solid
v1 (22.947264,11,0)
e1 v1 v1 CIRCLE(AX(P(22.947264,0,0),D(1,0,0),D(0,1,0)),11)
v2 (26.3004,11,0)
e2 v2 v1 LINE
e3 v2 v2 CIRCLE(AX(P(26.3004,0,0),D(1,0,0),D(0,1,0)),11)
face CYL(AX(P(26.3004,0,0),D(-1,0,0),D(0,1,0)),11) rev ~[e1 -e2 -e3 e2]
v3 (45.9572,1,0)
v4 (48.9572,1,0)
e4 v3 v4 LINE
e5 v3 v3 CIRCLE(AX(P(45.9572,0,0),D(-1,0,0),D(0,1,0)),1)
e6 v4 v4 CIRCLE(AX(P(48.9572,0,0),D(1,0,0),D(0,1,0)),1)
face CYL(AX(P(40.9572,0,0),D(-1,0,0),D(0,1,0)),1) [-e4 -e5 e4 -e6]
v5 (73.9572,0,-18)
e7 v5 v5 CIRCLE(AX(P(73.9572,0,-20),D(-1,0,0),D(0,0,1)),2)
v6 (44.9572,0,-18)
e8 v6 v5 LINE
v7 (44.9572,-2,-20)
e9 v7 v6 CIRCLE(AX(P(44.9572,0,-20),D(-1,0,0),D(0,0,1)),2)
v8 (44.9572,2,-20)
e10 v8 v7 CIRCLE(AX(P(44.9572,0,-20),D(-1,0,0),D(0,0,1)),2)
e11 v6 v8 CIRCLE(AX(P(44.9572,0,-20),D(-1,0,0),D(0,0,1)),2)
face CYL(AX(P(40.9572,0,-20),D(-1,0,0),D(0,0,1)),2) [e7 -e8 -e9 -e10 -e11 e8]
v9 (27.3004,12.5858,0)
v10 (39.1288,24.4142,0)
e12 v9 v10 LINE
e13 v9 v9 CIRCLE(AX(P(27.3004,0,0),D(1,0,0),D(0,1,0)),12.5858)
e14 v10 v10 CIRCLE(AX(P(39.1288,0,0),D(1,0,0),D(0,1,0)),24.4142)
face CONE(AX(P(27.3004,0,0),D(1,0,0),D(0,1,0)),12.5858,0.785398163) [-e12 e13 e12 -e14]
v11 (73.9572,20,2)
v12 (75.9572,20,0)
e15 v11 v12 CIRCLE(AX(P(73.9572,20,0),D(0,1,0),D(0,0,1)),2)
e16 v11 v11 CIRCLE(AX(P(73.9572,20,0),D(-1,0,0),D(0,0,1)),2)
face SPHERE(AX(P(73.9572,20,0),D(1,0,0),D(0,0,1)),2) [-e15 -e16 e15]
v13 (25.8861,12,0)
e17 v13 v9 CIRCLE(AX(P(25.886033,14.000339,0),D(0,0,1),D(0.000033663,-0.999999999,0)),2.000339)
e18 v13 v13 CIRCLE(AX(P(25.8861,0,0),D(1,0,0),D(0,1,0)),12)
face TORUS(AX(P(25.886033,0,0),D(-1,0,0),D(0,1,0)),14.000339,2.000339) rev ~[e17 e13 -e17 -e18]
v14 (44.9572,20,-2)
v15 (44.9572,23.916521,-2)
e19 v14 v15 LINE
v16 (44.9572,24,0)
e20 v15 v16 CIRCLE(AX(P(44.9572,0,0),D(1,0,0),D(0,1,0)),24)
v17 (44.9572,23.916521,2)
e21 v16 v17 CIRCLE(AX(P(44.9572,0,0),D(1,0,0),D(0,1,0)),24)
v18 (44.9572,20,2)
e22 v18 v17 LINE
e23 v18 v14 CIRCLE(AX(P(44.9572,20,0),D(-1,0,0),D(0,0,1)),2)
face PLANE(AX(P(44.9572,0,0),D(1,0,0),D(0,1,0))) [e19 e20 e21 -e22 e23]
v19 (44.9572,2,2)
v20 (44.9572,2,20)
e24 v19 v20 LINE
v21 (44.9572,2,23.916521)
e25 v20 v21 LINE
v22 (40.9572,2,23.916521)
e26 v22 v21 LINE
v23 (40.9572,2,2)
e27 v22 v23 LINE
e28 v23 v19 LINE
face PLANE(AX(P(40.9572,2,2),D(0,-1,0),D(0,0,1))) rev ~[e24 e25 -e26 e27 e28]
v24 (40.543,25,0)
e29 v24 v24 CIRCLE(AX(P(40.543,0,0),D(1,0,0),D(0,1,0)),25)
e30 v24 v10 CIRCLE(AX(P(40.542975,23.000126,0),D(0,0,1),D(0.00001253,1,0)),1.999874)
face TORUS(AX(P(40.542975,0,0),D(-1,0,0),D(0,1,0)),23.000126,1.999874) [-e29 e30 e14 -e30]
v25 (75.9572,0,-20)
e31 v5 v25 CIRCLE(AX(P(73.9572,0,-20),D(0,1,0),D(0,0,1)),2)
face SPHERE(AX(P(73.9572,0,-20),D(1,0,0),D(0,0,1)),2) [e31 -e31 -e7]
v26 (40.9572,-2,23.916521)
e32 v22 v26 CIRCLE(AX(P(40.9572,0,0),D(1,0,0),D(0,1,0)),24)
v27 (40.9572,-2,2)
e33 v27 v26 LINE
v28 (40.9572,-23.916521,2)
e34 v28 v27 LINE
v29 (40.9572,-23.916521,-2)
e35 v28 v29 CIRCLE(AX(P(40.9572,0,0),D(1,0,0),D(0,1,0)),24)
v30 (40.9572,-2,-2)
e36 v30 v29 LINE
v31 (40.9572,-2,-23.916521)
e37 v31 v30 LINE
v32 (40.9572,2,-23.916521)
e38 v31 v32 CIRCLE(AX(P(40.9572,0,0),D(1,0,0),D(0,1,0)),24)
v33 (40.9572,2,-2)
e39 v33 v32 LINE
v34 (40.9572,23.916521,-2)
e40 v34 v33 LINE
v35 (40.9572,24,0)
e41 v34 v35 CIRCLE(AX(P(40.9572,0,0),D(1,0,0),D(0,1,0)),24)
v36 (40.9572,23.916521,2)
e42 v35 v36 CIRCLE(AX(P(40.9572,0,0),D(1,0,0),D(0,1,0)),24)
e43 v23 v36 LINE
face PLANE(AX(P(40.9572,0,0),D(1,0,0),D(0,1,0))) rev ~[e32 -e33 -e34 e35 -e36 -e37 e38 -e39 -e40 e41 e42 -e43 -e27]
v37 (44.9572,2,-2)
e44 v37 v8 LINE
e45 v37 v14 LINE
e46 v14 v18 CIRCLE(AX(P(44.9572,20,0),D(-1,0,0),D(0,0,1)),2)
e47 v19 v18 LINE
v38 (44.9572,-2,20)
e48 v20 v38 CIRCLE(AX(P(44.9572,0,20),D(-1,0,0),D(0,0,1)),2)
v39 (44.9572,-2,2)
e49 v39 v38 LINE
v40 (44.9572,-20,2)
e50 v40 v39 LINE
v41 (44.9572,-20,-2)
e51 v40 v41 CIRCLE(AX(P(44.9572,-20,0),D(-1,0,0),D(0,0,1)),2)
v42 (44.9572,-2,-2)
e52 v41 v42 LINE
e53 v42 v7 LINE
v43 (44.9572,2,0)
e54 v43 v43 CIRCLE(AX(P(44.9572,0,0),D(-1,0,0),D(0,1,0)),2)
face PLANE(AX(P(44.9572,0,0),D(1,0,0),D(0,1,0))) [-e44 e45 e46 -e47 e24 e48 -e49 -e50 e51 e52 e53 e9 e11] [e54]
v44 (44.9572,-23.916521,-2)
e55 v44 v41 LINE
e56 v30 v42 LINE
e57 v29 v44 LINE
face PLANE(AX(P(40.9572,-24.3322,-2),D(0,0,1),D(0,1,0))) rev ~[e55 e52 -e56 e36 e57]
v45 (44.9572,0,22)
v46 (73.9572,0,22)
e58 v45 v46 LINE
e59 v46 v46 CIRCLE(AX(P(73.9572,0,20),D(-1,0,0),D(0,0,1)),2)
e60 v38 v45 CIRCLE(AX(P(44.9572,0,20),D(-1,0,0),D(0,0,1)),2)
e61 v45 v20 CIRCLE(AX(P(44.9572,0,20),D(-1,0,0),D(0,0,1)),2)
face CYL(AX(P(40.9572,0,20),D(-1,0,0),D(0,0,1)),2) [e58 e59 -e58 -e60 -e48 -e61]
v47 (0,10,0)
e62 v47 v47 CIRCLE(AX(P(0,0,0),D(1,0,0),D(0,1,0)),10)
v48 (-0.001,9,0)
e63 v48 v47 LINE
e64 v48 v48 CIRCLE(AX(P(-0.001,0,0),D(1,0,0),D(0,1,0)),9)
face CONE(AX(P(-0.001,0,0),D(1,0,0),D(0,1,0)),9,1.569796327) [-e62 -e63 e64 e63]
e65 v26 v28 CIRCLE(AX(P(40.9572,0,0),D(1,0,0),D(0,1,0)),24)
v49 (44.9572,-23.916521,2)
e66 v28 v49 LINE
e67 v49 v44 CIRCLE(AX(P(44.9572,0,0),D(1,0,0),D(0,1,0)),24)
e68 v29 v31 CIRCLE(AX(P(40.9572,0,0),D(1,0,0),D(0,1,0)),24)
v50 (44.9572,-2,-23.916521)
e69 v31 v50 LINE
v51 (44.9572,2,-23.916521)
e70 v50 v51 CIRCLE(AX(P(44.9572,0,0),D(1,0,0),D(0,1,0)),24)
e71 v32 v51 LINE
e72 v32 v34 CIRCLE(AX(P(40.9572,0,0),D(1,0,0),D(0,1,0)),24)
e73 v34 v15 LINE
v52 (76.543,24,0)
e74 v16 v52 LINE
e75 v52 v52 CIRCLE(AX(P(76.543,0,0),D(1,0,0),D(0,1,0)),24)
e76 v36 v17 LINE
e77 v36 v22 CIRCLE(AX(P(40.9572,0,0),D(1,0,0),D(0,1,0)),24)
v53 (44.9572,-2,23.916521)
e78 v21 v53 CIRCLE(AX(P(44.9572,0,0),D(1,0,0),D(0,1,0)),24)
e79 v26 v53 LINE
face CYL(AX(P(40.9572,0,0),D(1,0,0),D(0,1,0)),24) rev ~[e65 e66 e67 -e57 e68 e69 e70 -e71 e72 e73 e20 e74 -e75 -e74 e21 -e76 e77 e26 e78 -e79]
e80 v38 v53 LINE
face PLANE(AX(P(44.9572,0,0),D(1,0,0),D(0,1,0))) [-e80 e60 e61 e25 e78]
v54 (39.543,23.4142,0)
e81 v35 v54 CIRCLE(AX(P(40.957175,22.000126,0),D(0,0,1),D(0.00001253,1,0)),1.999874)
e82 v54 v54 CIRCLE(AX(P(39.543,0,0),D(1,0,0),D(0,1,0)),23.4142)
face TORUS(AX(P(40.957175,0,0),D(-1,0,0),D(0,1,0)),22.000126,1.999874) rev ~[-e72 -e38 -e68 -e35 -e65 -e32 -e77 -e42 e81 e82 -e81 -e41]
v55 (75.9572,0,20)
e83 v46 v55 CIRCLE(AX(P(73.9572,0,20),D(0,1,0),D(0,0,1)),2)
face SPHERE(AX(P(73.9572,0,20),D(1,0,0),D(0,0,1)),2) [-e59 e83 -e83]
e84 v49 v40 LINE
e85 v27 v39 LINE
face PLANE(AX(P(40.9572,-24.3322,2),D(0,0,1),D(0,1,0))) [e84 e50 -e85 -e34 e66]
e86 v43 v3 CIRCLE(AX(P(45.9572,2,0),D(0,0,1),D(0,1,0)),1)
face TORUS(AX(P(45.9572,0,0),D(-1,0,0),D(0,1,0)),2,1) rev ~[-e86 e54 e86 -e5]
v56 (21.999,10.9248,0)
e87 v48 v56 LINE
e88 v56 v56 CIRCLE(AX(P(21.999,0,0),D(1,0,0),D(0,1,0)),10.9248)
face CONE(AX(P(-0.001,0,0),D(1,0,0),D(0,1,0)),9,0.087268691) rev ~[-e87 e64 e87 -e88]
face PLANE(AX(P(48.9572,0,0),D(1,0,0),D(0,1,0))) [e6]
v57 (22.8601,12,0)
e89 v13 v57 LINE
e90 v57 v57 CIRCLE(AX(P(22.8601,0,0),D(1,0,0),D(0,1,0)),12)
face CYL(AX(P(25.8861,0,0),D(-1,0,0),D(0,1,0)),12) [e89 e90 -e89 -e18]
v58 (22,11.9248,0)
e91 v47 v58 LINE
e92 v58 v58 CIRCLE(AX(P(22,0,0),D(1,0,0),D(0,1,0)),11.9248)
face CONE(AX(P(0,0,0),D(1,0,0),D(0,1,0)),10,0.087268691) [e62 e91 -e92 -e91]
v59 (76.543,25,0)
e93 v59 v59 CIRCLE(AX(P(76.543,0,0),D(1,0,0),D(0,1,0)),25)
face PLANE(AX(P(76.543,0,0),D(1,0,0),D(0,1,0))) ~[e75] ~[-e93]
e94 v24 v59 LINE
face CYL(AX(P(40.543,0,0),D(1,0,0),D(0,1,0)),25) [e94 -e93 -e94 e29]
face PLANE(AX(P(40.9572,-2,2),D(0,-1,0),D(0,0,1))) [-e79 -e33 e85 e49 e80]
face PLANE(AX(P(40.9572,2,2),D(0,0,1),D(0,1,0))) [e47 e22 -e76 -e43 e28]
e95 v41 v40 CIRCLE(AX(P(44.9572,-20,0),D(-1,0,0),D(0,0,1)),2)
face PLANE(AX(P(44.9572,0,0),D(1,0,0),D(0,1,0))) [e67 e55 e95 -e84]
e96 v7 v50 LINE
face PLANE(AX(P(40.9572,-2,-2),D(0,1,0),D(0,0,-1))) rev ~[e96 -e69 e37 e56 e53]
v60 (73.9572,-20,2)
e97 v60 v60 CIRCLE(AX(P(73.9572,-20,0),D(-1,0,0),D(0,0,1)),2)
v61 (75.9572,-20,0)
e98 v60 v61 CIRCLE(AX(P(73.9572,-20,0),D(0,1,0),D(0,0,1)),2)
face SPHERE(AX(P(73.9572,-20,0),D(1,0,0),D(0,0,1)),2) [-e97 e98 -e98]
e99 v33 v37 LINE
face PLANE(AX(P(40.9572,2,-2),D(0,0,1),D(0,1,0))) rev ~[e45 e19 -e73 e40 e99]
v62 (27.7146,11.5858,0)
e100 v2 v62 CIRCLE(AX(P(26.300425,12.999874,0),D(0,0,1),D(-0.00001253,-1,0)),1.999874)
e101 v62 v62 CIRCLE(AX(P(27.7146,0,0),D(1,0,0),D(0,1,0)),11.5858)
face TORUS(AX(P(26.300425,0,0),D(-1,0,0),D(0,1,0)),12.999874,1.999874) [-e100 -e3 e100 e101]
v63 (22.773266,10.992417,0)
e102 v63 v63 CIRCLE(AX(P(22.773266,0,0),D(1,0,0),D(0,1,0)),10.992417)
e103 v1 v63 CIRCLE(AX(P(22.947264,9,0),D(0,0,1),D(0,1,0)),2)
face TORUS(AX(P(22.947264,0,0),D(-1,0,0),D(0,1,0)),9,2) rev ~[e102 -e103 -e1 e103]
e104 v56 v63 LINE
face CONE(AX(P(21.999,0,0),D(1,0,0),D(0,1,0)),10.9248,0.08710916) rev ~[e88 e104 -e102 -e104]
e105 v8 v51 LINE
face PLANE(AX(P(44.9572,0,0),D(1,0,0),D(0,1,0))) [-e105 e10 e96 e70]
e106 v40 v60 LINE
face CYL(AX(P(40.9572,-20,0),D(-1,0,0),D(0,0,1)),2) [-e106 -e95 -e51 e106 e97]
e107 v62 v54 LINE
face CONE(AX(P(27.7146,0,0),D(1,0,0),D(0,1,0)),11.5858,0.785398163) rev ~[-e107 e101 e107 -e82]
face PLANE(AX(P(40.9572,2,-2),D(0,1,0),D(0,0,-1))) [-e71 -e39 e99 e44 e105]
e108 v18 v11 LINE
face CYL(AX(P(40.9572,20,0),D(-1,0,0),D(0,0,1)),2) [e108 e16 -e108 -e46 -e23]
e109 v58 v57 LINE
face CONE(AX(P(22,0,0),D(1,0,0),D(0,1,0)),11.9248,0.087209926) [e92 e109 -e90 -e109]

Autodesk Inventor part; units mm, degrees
ref_plane "YZ Plane" through (0, 0, 0) normal (1, 0, 0) x (0, 1, 0)
ref_plane "XZ Plane" through (0, 0, 0) normal (0, 1, 0) x (-1, 0, 0)
sketch "Sketch1" plane through (0, 0, 0) normal (0, 0, 1) x (1, 0, 0)
  line L0 (0, 0) -> (20, 0)
  line L1 (-0.001, 9) -> (21.999, 10.9248)
  line L2 (-0.001, 9) -> (0, 10)
  line L3 (0, 10) -> (22, 11.9248)
  line L4 (26.3004, 11) -> (22.8601, 11)
  line L5 (25.8861, 12) -> (22.8601, 12)
  line L6 (22, 11.9248) -> (22.8601, 12)
  line L7 (21.999, 10.9248) -> (22.8601, 11)
  line L8 (27.3004, 12.5858) -> (39.1288, 24.4142)
  line L9 (40.543, 25) -> (76.543, 25)
  line L10 (27.7146, 11.5858) -> (39.543, 23.4142)
  line L11 (40.9572, 24) -> (76.543, 24)
  line L12 (76.543, 24) -> (76.543, 25)
  arc A0 (40.543, 25) -> (39.1288, 24.4142) centre (40.543, 23) ccw
  arc A1 (40.9572, 24) -> (39.543, 23.4142) centre (40.9572, 22) ccw
  arc A2 (25.8861, 12) -> (27.3004, 12.5858) centre (25.8861, 14) ccw
  arc A3 (26.3004, 11) -> (27.7146, 11.5858) centre (26.3004, 13) ccw
  point P0 (27.1288, 11)
  point P1 (26.7146, 12)
  dimension "d0" = 20
  dimension "d1" = 5
  dimension "d2" = 9
  dimension "d3" = 22
  dimension "d5" = 22
  dimension "d6" = 1
  dimension "d9" = 50
  dimension "d10" = 135
  dimension "d11" = 1
  dimension "d12" = 2
  dimension "d37" = 36
revolve "Revolution1" add sketch "Sketch1" angle 360 about axis through (0, 0, 0) along (1, 0, 0)
fillet "Fillet1" radius 2 2 edges at (21.999, -10.9248, 0) (22.8601, -11, 0)
fillet_without_effect "Fillet2"
ref_plane "Work Plane1" through (40.9572, 0, 0) normal (1, 0, 0) x (0, 1, 0)
sketch "Sketch2" plane through (40.9572, 0, 0) normal (1, 0, 0) x (0, 1, 0)
  line L0 (2, 2) -> (2, 24.3322)
  circle A0 centre (0, 0) radius 24.4142 projected
  line L1 (-2, -2) -> (-2, -24.3322)
  line L2 (2, -2) -> (2, -24.3322)
  line L3 (-24.3322, -2) -> (-2, -2)
  line L4 (2, -2) -> (24.3322, -2)
  line L5 (2, 2) -> (24.3322, 2)
  arc A1 (2, 24.3322) -> (-2, 24.3322) centre (0, 0) ccw
  arc A2 (-24.3322, 2) -> (-24.3322, -2) centre (0, 0) ccw
  arc A3 (-2, -24.3322) -> (2, -24.3322) centre (0, 0) ccw
  arc A4 (24.3322, -2) -> (24.3322, 2) centre (0, 0) ccw
  line L6 (-24.3322, 2) -> (-2, 2)
  line L7 (-2, 2) -> (-2, 24.3322)
  arc A5 (-2, 24.3322) -> (-24.3322, 2) centre (0, 0) ccw
  dimension "d14" = 4
  dimension "d15" = 0
  dimension "d16" = 4
  dimension "d17" = 2
  dimension "d18" = 2
  dimension "d19" = 22.3322
extrude "Extrusion1" add sketch "Sketch2" along normal blind 4 contours L5 A0 L4 L2 L1 L3 L6 L7 L0
sketch "Sketch3" plane through (40.9572, 0, 0) normal (1, 0, 0) x (0, 1, 0)
  circle A0 centre (0, 0) radius 1
  dimension "d24" = 2
extrude "Extrusion2" add sketch "Sketch3" along normal blind 8
sketch "Sketch4" plane through (40.9572, 0, 0) normal (-1, 0, 0) x (0, 0, 1)
  circle A0 centre (20, 0) radius 2
  line L0 (23.9165, -2) -> (2, -2) projected
  circle A1 centre (0, -20) radius 2
  circle A2 centre (-20, 0) radius 2
  circle A3 centre (0, 20) radius 2
  point P0 (0, 0)
  dimension "d28" = 4
  dimension "d29" = 4
  dimension "d30" = 4
  dimension "d31" = 20
  dimension "d32" = 20
  dimension "d33" = 20
  dimension "d34" = 20
extrude "Extrusion3" add sketch "Sketch4" against normal blind 35
fillet "Fillet5" radius 1 1 edges at (44.9572, -1, 0)
fillet "Fillet7" radius 2 4 edges at (75.9572, 20, -2) (75.9572, 0, 18) (75.9572, -20, -2) (75.9572, 0, -22)
properties part number "CheckValve 1.0"
